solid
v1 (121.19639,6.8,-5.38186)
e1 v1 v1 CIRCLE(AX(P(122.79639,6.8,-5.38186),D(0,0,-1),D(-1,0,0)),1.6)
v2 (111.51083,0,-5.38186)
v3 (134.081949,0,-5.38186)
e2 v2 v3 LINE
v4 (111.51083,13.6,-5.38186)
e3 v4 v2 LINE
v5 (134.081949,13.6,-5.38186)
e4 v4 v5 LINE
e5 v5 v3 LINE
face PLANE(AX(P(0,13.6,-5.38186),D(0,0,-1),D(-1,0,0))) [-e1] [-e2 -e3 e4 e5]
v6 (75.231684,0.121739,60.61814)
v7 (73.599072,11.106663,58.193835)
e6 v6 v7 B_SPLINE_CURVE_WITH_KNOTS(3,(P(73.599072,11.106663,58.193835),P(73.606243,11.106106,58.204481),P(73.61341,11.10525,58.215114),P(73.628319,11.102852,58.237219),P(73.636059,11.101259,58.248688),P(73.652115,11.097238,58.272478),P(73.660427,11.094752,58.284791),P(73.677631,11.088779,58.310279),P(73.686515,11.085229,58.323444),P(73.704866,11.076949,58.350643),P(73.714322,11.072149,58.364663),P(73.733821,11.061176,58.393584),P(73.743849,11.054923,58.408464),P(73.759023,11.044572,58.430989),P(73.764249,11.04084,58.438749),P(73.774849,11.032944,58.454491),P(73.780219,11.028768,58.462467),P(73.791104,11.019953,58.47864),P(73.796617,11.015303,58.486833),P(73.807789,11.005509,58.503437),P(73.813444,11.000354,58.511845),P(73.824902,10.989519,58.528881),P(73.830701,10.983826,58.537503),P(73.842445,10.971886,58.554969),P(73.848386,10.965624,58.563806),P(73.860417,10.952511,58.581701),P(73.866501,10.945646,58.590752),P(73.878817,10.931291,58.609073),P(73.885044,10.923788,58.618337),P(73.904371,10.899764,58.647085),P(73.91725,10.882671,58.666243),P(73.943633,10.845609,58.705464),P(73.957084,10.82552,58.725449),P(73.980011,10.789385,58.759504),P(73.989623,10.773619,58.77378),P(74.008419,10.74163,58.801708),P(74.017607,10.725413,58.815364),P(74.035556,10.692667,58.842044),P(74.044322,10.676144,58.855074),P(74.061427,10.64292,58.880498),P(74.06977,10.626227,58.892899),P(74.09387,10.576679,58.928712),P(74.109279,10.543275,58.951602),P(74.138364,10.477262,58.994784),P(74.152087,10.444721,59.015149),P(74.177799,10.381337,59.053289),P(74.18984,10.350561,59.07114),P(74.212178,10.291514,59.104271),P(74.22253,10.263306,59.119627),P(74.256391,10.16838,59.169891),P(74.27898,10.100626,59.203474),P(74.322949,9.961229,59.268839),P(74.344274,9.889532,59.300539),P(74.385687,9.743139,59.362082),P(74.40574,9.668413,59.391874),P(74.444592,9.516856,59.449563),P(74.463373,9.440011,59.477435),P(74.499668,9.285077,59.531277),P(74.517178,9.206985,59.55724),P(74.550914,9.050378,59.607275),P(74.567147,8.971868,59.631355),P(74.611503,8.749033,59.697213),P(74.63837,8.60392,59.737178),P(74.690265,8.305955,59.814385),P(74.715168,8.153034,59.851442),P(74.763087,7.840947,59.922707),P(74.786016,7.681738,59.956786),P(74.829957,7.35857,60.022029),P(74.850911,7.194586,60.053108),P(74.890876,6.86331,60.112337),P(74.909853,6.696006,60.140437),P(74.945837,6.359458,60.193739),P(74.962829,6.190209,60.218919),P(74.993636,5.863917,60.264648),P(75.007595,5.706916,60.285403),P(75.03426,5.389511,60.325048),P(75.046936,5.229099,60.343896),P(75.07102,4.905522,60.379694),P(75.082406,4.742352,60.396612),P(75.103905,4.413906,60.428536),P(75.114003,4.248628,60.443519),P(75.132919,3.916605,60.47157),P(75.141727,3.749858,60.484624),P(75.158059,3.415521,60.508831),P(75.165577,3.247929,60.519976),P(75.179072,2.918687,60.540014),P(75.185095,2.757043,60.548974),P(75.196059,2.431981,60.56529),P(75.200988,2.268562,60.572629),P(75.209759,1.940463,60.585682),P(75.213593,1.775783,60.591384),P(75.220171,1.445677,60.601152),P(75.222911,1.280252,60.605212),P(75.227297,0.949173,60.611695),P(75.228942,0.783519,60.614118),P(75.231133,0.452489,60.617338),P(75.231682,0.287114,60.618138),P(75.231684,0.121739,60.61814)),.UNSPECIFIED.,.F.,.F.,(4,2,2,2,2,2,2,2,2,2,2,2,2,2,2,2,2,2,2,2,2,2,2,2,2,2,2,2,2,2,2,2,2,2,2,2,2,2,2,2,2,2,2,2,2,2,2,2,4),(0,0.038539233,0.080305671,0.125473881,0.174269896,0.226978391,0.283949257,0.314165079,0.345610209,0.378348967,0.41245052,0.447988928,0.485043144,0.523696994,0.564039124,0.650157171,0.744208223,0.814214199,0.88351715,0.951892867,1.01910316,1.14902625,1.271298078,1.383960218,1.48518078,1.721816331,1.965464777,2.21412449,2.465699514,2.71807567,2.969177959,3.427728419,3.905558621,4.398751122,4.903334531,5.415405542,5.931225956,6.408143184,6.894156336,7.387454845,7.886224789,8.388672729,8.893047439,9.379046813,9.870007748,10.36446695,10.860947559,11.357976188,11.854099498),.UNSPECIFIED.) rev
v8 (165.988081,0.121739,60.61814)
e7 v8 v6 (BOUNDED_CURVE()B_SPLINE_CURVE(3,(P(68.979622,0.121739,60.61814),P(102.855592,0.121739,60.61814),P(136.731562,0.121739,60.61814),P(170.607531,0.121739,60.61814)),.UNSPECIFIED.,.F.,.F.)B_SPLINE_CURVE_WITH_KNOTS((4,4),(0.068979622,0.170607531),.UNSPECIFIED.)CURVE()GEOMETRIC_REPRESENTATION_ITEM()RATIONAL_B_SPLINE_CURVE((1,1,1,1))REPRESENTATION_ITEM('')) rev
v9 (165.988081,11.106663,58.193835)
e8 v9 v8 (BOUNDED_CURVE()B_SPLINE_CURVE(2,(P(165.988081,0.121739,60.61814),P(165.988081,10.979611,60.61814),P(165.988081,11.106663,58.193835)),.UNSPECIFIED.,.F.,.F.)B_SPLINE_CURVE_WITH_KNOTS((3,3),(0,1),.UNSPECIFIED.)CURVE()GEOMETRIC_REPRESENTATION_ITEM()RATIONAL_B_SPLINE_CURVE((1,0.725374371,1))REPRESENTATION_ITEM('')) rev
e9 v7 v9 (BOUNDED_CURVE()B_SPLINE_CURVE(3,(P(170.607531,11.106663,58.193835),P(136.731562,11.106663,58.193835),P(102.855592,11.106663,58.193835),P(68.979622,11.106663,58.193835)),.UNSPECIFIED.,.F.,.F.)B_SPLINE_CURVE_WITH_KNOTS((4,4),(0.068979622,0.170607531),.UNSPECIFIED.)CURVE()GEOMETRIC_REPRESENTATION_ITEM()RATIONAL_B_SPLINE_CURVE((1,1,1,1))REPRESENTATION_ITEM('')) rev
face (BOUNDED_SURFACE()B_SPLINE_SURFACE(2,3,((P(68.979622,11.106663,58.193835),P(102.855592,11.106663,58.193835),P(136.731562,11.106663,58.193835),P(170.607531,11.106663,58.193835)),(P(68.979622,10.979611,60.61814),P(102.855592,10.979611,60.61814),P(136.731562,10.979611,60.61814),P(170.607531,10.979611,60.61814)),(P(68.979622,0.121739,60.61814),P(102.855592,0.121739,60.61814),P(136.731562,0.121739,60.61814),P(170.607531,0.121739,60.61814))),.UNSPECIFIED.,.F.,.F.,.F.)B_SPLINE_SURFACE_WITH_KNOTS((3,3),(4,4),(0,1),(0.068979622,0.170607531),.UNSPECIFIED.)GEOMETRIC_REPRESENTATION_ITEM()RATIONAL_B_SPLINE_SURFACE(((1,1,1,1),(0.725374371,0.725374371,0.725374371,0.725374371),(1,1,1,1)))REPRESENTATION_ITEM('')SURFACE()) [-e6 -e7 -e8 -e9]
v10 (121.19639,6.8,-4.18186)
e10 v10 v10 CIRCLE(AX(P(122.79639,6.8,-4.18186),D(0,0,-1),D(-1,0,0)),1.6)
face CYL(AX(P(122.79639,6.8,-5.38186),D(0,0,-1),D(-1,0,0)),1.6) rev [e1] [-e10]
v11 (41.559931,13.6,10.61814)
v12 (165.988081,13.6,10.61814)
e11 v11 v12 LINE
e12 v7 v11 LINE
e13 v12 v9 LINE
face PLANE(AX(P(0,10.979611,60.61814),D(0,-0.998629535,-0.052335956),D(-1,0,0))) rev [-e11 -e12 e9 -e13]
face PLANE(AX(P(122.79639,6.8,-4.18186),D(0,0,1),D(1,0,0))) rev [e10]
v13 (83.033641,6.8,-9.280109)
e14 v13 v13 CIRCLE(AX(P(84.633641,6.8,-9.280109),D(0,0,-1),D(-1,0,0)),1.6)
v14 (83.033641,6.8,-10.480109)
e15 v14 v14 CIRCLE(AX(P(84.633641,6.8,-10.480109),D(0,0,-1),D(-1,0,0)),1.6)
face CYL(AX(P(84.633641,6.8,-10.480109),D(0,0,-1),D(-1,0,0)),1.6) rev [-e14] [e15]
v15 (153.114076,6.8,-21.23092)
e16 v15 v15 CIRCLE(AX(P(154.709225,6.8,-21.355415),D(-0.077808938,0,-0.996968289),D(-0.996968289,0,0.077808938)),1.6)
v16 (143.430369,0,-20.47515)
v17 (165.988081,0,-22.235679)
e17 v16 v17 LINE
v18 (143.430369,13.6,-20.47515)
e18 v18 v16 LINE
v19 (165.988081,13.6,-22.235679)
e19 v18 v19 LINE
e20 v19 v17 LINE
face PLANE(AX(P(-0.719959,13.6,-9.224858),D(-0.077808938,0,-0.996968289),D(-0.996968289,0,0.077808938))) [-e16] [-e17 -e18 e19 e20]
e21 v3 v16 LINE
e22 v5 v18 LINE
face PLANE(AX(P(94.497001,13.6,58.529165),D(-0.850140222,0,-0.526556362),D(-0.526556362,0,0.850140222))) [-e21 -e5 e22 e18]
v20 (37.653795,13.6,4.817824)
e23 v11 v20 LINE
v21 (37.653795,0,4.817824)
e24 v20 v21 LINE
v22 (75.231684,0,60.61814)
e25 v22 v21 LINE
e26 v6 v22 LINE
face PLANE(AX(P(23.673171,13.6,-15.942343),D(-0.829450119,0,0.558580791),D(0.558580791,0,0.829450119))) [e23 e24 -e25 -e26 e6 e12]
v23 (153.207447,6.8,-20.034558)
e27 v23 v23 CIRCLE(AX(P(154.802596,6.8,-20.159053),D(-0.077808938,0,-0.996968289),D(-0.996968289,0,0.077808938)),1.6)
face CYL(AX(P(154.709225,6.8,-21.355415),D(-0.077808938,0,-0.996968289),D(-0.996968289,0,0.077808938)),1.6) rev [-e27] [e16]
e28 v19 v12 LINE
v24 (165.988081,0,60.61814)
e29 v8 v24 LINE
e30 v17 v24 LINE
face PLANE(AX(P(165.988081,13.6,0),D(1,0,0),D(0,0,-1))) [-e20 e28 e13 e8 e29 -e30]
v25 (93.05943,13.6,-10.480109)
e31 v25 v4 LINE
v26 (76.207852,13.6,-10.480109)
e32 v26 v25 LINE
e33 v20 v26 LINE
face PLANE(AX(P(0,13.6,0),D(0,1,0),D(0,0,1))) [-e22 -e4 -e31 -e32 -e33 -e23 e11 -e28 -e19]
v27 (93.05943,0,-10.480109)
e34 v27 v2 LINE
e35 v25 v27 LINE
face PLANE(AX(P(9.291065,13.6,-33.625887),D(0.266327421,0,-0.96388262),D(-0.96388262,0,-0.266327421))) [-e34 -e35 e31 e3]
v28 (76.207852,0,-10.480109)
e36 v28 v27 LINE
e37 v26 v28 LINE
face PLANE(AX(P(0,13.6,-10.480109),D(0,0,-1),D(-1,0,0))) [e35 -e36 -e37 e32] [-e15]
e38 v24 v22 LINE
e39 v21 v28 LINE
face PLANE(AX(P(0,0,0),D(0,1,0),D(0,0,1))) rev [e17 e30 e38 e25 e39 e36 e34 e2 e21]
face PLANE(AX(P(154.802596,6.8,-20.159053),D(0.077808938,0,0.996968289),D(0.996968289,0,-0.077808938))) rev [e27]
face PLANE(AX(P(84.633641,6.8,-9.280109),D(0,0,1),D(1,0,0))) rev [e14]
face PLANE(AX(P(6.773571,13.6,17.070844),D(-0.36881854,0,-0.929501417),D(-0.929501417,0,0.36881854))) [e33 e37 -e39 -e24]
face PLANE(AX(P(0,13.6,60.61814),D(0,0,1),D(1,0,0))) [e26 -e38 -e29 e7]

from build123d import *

# Parameters (mm, degrees)
BOSS_EXTRUDE1_DEPTH       = 13.6
BOSS_EXTRUDE2_DEPTH       = 13.6
CHAMFER1_SIZE             = 50
CHAMFER1_SIZE2            = 2.620388964
F_3_0MM_DOWEL_HOLE1_D     = 3.2
F_3_0MM_DOWEL_HOLE1_DEPTH = 1.2
F_3_0MM_DOWEL_HOLE2_D     = 3.2
F_3_0MM_DOWEL_HOLE2_DEPTH = 1.2
F_3_0MM_DOWEL_HOLE3_D     = 3.2
F_3_0MM_DOWEL_HOLE3_DEPTH = 1.2


with BuildPart() as part:
    # wrist → Boss-Extrude1 (new body)
    with BuildSketch(Plane(origin=(0, 0, 0), x_dir=(1, 0, 0), z_dir=(0, 1, 0))):
        Polygon((165.988080985, -4.817824349), (165.988080985, 22.235679058), (143.430369308, 20.475150048), (134.081949487, 5.381860359), (111.510829699, 5.381860359), (93.059430407, 10.480109343), (76.207852469, 10.480109343), (37.653795388, -4.817824349), align=None)
    extrude(amount=BOSS_EXTRUDE1_DEPTH)

    # wrist<5> → Boss-Extrude2 (add)
    with BuildSketch(Plane(origin=(0, 0, 0), x_dir=(1, 0, 0), z_dir=(0, 1, 0))):
        Polygon((165.988080985, -60.618139641), (165.988080985, -4.817824349), (37.653795388, -4.817824349), (75.231684079, -60.618139641), align=None)
    extrude(amount=BOSS_EXTRUDE2_DEPTH)

    # Chamfer1
    chamfer1_edges = [part.edges().sort_by_distance(p)[0] for p in [
        (120.609882532, 13.6, 60.618139641),
    ]]
    chamfer1_side = [part.faces().sort_by_distance(p)[0] for p in [
        (112.052751193, 13.6, 23.244648168),
    ]]
    chamfer(chamfer1_edges, length=CHAMFER1_SIZE, length2=CHAMFER1_SIZE2, reference=chamfer1_side[0])

    # Fillet1
    # an asymmetric fillet: 11, 3 mm, written as the material it takes off along each edge
    with BuildSketch(Plane(origin=(48.087002909, 10.979611036, 60.618139641), x_dir=(0, 0.05233595624294356, -0.9986295347545739), z_dir=(1, 0, 0))) as fillet1_piece_1:
        with BuildLine():
            Bezier((2.427631466, 0), (0, 0), (-0.568257138, -10.842992131), weights=[1, 0.725374371, 1])
            Line((-0.568257138, -10.842992131), (0, 0))
            Line((0, 0), (2.427631466, 0))
        make_face()
    extrude(amount=145.045759247, mode=Mode.SUBTRACT)

    # Ø3.0mm Dowel Hole1
    with Locations(Plane(origin=(-0.719959147, 0, -9.224858415), x_dir=(-0.9969682889311796, 0, 0.07780893821172487), z_dir=(-0.07780893821172487, 0, -0.9969682889311796))):
        with Locations((-155.901833608, 6.8)):
            Hole(F_3_0MM_DOWEL_HOLE1_D / 2, depth=F_3_0MM_DOWEL_HOLE1_DEPTH)

    # Ø3.0mm Dowel Hole2
    with Locations(Plane(origin=(0, 0, -5.381860359), x_dir=(-1, 0, 0), z_dir=(0, 0, -1))):
        with Locations((-122.796389593, 6.8)):
            Hole(F_3_0MM_DOWEL_HOLE2_D / 2, depth=F_3_0MM_DOWEL_HOLE2_DEPTH)

    # Ø3.0mm Dowel Hole3
    with Locations(Plane(origin=(0, 0, -10.480109343), x_dir=(-1, 0, 0), z_dir=(0, 0, -1))):
        with Locations((-84.633641438, 6.8)):
            Hole(F_3_0MM_DOWEL_HOLE3_D / 2, depth=F_3_0MM_DOWEL_HOLE3_DEPTH)


solid = part.part
